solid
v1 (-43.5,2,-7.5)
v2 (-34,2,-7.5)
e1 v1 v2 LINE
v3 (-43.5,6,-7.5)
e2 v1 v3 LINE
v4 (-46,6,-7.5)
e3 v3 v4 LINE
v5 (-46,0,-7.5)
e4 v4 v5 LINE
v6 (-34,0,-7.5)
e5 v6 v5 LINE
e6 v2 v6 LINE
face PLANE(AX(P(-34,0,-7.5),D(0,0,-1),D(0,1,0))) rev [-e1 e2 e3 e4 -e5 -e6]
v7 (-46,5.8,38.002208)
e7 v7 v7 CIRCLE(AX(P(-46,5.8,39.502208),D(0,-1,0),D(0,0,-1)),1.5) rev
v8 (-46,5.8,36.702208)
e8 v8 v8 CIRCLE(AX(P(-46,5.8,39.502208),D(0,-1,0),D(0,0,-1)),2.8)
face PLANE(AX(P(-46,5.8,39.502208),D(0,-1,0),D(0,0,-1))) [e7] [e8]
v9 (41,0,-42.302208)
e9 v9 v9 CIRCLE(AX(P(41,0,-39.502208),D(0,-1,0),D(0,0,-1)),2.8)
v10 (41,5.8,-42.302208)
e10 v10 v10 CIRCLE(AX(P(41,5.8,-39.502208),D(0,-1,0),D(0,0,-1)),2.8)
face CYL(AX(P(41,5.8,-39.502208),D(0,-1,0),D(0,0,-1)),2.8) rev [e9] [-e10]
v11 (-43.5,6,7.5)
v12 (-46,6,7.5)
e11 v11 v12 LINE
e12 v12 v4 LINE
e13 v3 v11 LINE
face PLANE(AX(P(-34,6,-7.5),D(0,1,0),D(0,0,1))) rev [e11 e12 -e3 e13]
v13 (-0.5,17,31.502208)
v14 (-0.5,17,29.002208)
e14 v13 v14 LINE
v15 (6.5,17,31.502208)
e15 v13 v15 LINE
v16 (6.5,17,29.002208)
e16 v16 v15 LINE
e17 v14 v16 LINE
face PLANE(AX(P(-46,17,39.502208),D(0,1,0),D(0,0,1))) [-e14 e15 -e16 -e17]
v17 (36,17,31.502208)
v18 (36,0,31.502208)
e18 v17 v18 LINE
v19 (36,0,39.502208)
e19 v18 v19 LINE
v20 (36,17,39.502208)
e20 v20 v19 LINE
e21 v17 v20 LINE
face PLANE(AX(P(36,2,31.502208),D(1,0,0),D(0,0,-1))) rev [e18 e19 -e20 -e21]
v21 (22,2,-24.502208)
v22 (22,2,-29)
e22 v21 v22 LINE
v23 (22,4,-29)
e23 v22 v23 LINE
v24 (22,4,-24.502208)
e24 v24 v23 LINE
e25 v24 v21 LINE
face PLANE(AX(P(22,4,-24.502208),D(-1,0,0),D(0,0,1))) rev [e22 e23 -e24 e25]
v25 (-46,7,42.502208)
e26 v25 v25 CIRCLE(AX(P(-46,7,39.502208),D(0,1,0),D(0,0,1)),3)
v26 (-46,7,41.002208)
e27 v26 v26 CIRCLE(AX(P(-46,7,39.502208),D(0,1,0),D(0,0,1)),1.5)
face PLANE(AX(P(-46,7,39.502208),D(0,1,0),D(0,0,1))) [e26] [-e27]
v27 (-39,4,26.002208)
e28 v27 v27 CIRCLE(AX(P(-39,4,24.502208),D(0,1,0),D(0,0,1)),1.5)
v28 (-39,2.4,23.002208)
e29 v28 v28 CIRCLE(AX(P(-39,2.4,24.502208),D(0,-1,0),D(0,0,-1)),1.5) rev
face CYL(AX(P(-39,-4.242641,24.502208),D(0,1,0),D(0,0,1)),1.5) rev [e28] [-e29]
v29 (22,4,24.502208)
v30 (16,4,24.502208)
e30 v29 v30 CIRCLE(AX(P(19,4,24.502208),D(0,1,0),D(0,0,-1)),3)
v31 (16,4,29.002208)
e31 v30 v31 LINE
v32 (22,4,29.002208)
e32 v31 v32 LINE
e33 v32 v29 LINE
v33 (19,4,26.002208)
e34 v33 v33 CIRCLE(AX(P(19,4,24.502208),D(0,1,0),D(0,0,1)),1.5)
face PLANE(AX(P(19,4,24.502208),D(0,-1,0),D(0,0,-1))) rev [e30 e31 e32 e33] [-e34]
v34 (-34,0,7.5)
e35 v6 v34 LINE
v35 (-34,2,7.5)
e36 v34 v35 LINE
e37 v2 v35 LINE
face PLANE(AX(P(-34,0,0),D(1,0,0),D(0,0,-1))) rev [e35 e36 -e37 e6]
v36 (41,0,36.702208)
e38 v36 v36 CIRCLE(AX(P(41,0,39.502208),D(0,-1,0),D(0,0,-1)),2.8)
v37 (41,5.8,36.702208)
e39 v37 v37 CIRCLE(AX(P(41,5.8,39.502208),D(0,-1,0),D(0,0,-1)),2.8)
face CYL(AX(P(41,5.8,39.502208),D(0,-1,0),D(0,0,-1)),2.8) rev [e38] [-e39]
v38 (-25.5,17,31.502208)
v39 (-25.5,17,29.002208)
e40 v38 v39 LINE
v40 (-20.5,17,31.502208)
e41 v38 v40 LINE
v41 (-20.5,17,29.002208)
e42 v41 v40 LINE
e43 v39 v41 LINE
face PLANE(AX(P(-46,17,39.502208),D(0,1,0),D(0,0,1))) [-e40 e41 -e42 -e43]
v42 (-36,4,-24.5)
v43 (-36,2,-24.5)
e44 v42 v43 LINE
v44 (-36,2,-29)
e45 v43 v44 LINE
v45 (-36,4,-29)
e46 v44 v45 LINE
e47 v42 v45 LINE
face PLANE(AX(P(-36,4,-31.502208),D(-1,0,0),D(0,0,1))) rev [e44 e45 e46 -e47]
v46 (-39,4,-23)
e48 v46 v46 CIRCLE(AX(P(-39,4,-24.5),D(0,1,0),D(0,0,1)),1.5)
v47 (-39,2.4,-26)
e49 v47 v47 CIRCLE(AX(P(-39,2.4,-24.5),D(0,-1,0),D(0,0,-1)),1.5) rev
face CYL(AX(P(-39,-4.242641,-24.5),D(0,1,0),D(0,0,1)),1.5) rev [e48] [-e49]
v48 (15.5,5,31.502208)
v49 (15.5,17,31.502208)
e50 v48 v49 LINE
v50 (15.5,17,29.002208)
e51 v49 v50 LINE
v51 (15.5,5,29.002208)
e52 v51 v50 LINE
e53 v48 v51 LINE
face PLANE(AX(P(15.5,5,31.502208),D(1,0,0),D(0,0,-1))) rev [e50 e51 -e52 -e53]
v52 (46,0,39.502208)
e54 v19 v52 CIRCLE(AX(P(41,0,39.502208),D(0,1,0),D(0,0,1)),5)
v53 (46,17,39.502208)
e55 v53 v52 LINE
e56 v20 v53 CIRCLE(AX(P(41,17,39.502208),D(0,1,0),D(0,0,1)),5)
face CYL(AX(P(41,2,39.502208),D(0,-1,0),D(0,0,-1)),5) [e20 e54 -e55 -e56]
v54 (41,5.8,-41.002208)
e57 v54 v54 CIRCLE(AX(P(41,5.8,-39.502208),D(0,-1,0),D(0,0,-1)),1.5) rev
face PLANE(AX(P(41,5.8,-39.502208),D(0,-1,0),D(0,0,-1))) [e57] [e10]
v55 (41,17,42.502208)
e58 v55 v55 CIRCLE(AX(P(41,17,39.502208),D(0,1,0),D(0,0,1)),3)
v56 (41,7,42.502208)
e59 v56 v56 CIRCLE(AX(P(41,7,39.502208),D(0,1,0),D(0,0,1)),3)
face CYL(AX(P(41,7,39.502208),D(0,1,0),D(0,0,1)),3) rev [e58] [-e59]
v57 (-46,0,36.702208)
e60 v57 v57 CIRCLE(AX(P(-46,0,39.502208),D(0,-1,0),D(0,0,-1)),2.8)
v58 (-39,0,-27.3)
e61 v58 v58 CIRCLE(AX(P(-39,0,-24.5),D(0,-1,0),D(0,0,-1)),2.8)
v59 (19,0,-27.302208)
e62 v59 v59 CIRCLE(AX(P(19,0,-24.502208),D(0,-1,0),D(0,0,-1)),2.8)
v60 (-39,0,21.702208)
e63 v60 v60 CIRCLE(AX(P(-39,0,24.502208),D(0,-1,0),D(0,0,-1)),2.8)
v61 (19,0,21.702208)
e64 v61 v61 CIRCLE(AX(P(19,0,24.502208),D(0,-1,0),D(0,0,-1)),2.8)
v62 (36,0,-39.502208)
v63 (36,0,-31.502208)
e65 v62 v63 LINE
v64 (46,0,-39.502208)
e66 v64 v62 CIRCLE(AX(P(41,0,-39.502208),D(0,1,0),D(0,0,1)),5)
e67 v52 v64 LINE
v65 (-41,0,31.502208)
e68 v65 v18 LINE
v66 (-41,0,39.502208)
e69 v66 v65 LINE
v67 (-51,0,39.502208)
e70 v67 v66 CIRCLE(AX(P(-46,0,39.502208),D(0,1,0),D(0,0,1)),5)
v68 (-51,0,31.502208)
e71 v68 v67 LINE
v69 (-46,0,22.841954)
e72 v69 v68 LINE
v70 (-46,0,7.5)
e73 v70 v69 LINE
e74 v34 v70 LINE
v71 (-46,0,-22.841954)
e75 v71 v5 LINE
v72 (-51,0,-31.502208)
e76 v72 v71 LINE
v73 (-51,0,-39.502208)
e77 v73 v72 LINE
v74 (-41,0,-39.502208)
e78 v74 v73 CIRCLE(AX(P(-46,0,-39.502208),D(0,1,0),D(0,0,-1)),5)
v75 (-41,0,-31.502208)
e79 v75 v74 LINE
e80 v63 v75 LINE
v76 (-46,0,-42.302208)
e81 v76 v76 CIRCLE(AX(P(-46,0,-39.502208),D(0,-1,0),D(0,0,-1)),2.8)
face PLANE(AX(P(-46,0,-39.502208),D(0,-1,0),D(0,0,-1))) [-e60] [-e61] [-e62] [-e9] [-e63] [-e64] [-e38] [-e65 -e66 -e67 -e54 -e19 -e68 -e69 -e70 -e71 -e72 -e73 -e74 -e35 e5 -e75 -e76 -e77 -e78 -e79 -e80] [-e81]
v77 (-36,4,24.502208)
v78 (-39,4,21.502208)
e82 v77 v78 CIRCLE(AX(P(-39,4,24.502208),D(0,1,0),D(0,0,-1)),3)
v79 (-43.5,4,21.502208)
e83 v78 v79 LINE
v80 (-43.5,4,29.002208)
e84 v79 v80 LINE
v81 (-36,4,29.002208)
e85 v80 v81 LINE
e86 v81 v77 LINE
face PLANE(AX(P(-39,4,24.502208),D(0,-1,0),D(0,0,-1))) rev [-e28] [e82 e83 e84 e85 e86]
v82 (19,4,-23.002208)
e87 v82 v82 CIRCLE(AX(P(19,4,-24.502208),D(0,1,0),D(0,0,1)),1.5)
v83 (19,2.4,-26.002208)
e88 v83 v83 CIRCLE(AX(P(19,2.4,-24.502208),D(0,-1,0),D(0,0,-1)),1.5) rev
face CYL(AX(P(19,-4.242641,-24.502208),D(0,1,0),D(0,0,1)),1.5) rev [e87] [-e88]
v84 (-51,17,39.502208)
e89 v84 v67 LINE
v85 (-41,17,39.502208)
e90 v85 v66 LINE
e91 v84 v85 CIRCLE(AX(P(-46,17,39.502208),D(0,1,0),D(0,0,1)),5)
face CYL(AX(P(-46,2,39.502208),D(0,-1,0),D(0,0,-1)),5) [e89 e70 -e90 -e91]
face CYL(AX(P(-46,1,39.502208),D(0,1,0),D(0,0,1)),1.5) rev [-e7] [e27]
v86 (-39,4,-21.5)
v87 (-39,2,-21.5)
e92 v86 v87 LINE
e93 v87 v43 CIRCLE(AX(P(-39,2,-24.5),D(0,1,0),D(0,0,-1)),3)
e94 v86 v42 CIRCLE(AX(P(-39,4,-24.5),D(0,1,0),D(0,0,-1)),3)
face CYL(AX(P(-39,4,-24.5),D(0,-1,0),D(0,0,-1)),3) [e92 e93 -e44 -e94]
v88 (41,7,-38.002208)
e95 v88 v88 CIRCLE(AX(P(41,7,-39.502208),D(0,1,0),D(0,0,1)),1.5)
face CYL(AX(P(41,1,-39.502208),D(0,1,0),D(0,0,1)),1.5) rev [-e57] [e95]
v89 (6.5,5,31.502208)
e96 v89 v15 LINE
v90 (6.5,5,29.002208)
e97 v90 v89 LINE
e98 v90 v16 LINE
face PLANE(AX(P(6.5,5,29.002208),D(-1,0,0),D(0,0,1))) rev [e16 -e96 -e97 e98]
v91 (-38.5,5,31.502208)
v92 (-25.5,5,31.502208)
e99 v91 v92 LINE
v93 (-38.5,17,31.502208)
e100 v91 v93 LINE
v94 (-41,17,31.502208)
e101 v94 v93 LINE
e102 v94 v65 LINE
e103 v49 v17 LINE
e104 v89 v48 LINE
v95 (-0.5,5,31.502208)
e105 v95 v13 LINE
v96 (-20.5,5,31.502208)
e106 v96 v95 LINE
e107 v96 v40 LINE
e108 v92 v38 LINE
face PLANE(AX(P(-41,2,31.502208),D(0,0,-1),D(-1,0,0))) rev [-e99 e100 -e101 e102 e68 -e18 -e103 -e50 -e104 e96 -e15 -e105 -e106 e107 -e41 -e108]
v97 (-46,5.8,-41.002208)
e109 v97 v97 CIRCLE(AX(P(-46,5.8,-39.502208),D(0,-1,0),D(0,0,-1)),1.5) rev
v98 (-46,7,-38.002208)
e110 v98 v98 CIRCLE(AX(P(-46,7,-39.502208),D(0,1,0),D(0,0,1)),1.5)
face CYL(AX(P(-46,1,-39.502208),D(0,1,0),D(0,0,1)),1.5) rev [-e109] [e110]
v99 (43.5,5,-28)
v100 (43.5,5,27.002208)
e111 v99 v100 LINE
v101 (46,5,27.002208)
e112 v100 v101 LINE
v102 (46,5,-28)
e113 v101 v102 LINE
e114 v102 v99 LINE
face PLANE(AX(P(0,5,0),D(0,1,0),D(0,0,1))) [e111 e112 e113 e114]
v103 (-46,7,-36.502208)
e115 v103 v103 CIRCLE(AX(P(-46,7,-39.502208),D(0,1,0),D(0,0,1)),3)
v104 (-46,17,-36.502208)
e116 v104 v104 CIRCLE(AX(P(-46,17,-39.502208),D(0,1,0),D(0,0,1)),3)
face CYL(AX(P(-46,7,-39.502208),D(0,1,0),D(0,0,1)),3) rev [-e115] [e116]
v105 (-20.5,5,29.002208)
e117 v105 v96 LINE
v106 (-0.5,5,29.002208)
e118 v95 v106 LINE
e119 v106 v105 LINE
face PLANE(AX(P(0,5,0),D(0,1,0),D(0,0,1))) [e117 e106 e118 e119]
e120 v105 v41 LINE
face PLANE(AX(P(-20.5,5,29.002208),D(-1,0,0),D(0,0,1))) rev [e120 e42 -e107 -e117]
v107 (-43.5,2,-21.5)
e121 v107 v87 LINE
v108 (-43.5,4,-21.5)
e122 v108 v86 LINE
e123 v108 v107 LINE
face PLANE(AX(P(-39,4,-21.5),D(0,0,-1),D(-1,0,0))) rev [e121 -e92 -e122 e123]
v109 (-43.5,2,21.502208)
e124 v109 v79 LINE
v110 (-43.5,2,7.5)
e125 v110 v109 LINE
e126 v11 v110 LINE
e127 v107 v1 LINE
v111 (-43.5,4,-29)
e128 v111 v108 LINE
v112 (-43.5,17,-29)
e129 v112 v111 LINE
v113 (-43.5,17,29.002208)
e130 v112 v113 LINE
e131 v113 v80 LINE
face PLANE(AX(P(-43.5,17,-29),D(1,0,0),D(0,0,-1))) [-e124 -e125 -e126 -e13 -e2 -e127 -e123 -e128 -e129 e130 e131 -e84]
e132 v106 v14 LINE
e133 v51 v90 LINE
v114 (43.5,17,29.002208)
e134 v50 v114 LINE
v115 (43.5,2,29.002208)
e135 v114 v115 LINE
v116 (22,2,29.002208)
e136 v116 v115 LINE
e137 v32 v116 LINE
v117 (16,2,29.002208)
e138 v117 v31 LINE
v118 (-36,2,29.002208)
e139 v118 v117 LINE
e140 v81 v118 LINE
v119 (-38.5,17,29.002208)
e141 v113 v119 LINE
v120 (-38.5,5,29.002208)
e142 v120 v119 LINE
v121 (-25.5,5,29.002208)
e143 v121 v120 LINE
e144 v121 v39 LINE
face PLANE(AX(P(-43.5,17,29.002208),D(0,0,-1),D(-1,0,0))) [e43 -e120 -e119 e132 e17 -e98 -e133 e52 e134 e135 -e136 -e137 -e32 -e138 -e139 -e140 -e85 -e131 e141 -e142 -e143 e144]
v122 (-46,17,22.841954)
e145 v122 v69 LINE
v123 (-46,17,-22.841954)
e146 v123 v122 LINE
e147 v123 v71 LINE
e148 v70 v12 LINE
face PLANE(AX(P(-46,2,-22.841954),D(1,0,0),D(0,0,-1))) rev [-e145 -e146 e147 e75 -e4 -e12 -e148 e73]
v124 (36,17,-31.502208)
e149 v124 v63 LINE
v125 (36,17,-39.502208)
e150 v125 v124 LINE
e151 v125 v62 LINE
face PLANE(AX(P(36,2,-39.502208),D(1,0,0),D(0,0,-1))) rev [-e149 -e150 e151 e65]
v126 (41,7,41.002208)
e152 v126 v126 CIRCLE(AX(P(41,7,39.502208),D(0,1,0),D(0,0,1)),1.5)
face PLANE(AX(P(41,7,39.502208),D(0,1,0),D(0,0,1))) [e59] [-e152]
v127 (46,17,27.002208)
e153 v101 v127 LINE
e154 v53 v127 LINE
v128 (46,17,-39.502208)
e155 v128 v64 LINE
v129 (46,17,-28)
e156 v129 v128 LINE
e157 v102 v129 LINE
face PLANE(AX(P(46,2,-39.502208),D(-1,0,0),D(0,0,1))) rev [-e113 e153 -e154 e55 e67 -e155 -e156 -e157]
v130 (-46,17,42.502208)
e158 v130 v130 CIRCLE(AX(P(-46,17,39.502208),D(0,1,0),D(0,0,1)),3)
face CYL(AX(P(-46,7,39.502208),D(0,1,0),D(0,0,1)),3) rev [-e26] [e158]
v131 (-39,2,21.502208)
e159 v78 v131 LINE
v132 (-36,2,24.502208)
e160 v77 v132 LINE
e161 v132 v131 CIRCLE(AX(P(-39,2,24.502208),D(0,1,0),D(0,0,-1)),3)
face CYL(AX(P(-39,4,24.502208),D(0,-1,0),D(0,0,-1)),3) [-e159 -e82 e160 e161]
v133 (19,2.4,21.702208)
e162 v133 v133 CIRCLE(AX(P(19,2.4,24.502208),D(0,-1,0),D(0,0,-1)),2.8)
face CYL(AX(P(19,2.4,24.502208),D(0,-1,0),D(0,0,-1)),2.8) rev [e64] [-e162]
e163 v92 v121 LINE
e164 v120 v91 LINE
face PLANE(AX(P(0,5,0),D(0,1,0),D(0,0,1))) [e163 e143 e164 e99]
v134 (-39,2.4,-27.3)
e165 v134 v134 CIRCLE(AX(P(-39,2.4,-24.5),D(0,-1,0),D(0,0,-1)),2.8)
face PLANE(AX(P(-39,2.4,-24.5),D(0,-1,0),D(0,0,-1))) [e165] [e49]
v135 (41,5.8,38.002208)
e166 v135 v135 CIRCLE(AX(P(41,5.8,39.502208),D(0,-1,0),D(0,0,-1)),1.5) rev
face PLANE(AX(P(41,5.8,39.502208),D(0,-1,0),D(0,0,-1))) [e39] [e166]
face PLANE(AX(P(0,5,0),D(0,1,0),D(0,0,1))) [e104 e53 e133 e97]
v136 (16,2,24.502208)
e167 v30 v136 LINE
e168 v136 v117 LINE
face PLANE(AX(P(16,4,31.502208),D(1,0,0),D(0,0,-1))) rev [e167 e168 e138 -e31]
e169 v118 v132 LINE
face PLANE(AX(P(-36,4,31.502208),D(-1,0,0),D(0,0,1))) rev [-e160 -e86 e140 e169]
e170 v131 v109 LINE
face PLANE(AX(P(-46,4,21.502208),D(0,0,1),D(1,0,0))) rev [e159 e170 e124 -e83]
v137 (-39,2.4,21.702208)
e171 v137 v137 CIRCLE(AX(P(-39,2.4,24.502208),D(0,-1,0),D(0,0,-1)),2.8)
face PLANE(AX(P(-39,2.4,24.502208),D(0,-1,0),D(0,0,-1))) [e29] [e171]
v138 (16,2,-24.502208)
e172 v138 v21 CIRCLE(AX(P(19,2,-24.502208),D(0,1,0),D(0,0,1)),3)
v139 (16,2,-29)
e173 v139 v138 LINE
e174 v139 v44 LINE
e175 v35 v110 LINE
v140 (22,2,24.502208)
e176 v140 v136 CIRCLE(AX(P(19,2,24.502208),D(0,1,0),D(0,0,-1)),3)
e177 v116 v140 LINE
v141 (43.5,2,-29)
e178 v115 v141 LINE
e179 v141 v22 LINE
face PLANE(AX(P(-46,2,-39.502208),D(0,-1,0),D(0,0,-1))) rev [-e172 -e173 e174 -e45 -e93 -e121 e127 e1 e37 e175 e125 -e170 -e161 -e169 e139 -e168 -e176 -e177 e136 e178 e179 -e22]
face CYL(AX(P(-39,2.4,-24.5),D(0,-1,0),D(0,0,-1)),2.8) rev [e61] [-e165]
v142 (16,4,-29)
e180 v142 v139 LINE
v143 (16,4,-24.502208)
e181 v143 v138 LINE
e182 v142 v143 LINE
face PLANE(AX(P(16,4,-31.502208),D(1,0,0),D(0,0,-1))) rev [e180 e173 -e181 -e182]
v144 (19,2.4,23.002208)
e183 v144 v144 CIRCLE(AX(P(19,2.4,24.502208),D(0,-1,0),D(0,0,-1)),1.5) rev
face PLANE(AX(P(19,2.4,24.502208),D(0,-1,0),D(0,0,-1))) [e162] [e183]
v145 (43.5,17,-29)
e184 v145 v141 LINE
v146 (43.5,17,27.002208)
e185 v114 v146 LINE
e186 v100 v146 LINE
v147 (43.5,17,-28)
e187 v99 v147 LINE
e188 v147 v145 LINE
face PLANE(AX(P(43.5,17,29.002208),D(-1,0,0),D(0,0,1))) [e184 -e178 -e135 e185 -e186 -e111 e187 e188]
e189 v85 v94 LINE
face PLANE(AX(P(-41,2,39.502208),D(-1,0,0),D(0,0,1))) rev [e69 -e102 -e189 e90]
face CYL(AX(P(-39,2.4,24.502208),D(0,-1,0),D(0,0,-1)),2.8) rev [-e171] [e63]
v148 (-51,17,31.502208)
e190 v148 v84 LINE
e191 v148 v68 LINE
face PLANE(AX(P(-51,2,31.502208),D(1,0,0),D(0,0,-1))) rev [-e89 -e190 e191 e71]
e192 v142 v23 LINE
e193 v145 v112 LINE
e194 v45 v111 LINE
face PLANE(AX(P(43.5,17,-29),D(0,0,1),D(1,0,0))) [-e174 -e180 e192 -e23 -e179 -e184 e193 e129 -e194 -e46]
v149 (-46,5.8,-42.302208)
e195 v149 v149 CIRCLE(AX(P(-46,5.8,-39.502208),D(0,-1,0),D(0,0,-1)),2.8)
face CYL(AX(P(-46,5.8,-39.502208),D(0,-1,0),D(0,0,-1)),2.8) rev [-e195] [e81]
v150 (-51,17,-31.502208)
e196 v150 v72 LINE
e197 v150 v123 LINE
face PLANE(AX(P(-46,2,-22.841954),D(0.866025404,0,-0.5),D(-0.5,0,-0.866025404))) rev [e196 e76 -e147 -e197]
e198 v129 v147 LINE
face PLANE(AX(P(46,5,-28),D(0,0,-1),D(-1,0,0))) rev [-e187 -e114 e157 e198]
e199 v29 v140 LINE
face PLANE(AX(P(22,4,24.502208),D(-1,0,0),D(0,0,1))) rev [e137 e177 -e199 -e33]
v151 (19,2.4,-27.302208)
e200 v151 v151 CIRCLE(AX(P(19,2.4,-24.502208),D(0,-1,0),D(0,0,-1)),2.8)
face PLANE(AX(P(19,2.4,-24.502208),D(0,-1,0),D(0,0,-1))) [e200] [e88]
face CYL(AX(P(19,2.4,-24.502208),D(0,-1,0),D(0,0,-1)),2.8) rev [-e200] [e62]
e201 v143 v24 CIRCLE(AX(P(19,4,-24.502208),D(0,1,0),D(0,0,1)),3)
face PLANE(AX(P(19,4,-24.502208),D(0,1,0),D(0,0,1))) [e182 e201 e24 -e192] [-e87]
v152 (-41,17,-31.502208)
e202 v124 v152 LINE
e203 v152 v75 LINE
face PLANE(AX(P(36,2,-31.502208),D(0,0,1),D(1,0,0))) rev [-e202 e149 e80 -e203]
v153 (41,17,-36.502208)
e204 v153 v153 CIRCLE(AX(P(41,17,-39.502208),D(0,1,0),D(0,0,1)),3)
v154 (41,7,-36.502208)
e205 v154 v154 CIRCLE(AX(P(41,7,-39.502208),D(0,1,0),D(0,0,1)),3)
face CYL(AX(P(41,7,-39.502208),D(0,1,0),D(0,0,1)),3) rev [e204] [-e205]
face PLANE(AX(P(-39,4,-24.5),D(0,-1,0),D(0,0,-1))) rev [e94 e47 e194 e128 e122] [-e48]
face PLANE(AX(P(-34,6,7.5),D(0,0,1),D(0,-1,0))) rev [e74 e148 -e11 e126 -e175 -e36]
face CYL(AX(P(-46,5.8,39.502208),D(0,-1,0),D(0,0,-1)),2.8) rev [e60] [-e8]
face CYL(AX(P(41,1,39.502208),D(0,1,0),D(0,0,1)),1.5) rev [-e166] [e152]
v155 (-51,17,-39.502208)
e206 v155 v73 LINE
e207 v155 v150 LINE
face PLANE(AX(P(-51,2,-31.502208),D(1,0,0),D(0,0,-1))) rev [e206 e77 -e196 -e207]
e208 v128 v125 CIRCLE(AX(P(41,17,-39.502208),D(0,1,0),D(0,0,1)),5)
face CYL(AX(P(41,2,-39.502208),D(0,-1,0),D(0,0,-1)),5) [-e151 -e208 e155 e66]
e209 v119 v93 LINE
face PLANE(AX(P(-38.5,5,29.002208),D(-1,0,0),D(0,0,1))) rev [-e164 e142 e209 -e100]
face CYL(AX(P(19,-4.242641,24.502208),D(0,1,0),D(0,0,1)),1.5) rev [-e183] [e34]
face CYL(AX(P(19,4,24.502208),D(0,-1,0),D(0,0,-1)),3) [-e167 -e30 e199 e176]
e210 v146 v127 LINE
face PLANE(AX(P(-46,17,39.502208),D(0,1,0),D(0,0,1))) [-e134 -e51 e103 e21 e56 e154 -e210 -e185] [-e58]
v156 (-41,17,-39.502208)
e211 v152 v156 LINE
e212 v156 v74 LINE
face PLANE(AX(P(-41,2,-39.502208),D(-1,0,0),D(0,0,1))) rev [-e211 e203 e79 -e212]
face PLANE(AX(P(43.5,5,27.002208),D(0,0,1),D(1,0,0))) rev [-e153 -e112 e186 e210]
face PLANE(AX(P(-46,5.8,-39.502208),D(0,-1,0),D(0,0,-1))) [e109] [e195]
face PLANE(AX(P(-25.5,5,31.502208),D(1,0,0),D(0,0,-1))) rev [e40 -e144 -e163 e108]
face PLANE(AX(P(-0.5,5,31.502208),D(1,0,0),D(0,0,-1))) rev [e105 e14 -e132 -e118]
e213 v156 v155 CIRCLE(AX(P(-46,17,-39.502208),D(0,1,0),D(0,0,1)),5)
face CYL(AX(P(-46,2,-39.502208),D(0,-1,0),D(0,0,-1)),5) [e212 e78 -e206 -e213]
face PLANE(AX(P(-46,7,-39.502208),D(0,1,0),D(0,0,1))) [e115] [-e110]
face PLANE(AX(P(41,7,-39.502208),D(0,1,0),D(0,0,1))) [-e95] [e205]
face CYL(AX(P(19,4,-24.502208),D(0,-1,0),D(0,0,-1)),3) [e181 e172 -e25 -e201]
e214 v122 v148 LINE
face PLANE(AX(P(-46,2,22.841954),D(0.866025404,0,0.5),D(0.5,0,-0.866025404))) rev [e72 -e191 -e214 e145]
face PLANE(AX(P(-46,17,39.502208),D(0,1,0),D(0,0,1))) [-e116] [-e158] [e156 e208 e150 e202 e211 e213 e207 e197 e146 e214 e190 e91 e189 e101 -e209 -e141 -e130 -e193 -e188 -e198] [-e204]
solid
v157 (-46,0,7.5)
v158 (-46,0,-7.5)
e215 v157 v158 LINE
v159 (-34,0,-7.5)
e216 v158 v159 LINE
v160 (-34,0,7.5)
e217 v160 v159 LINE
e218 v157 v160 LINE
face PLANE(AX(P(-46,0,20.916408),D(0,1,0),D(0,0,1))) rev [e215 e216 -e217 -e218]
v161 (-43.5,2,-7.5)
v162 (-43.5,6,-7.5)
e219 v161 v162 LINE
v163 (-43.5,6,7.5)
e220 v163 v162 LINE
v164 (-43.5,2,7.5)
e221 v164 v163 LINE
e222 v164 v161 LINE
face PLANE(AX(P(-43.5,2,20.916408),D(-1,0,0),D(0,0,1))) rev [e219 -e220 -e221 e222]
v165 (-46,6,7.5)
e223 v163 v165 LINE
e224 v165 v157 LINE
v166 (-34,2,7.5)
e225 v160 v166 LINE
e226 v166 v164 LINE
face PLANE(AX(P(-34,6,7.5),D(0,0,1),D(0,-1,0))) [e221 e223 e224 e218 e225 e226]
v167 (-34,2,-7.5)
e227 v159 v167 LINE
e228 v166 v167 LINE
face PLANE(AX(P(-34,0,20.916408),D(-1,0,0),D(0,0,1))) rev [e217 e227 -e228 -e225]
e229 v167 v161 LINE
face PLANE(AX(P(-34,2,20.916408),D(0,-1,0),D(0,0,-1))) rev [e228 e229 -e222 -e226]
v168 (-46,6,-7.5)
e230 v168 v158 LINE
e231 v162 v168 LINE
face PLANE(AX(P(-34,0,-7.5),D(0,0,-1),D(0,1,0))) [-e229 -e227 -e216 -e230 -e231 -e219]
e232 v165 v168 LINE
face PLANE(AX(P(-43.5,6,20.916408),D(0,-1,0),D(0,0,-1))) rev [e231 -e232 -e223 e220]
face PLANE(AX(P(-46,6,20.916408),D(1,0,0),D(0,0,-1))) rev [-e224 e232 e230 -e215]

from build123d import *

# Parameters (mm, degrees)
BOSS_EXTRUDE1_DEPTH = 2
BOSS_EXTRUDE2_DEPTH = 2
SKETCH6_W           = 87
SKETCH6_H           = 58.002207555
BOSS_EXTRUDE3_DEPTH = 15
HOLE3_OUTLINE_R     = 1.5
HOLE3_DEPTH         = 4
HOLE4_OUTLINE_R     = 2.8
HOLE4_OUTLINE_R_2   = 1.5
HOLE4_DEPTH         = 2.4
SKETCH9_W           = 15
SKETCH9_H           = 6
CUT_EXTRUDE1_DEPTH  = 12
SKETCH10_W          = 13
SKETCH10_H          = 2.5
SKETCH10_W_2        = 20
SKETCH10_W_3        = 9
SKETCH10_W_4        = 2.5
SKETCH10_H_2        = 55.002207555
CUT_EXTRUDE2_DEPTH  = 12
HOLE5_START         = 7
HOLE5_OUTLINE_R     = 3
HOLE5_DEPTH         = 10
BOSS_EXTRUDE4_START = -7.5
BOSS_EXTRUDE4_DEPTH = 15
SKETCH_1_R          = 1.5
CUT_EXTRUDE_1_DEPTH = 6
SKETCH_2_R          = 2.8
CUT_EXTRUDE_2_DEPTH = 5.8


# Read off the part's stored shape, not the designer's step: Hole3, Hole4, Hole5
with BuildPart() as part:
    # Sketch1 → Boss-Extrude1 (new body)
    with BuildSketch(Plane(origin=(0, 0, 0), x_dir=(1, 0, 0), z_dir=(0, 1, 0))):
        with BuildLine():
            Line((-46, 22.841953517), (-46, -22.841953517))
            Line((-46, -22.841953517), (-51, -31.502207555))
            Line((-51, -31.502207555), (-51, -39.502207555))
            ThreePointArc((-51, -39.502207555), (-46, -44.502207555), (-41, -39.502207555))
            Line((-41, -39.502207555), (-41, -31.502207555))
            Line((-41, -31.502207555), (36, -31.502207555))
            Line((36, -31.502207555), (36, -39.502207555))
            ThreePointArc((36, -39.502207555), (41, -44.502207555), (46, -39.502207555))
            Line((46, -39.502207555), (46, 39.502207555))
            ThreePointArc((46, 39.502207555), (41, 44.502207555), (36, 39.502207555))
            Line((36, 39.502207555), (36, 31.502207555))
            Line((36, 31.502207555), (-41, 31.502207555))
            Line((-41, 31.502207555), (-41, 39.502207555))
            ThreePointArc((-41, 39.502207555), (-46, 44.502207555), (-51, 39.502207555))
            Line((-51, 39.502207555), (-51, 31.502207555))
            Line((-51, 31.502207555), (-46, 22.841953517))
        make_face()
    extrude(amount=BOSS_EXTRUDE1_DEPTH)

    # Sketch2 → Boss-Extrude2 (add)
    with BuildSketch(Plane(origin=(0, 2, 0), x_dir=(1, 0, 0), z_dir=(0, 1, 0))):
        with BuildLine():
            Line((-36, 31.502207555), (-36, 24.5))
            ThreePointArc((-36, 24.5), (-36.878679656, 22.378679656), (-39, 21.5))
            Line((-39, 21.5), (-46, 21.5))
            Line((-46, 21.5), (-46, 31.502207555))
            Line((-46, 31.502207555), (-36, 31.502207555))
        make_face()
        with BuildLine():
            Line((16, 31.502207555), (16, 24.502207555))
            ThreePointArc((16, 24.502207555), (19, 21.502207555), (22, 24.502207555))
            Line((22, 24.502207555), (22, 31.502207555))
            Line((22, 31.502207555), (16, 31.502207555))
        make_face()
        with BuildLine():
            Line((-36, -31.502207555), (-46, -31.502207555))
            Line((-46, -31.502207555), (-46, -21.502207555))
            Line((-46, -21.502207555), (-39, -21.502207555))
            ThreePointArc((-39, -21.502207555), (-36.878679656, -22.380887212), (-36, -24.502207555))
            Line((-36, -24.502207555), (-36, -31.502207555))
        make_face()
        with BuildLine():
            Line((16, -31.502207555), (16, -24.502207555))
            ThreePointArc((16, -24.502207555), (19, -21.502207555), (22, -24.502207555))
            Line((22, -24.502207555), (22, -31.502207555))
            Line((22, -31.502207555), (16, -31.502207555))
        make_face()
    extrude(amount=BOSS_EXTRUDE2_DEPTH)

    # Sketch6 → Boss-Extrude3 (add)
    with BuildSketch(Plane(origin=(0, 2, 0), x_dir=(1, 0, 0), z_dir=(0, 1, 0))):
        with BuildLine():
            Line((-46, -22.841953517), (-51, -31.502207555))
            Line((-51, -31.502207555), (-51, -39.502207555))
            ThreePointArc((-51, -39.502207555), (-46, -44.502207555), (-41, -39.502207555))
            Line((-41, -39.502207555), (-41, -31.502207555))
            Line((-41, -31.502207555), (36, -31.502207555))
            Line((36, -31.502207555), (36, -39.502207555))
            ThreePointArc((36, -39.502207555), (41, -44.502207555), (46, -39.502207555))
            Line((46, -39.502207555), (46, 39.502207555))
            ThreePointArc((46, 39.502207555), (41, 44.502207555), (36, 39.502207555))
            Line((36, 39.502207555), (36, 31.502207555))
            Line((36, 31.502207555), (-41, 31.502207555))
            Line((-41, 31.502207555), (-41, 39.502207555))
            ThreePointArc((-41, 39.502207555), (-46, 44.502207555), (-51, 39.502207555))
            Line((-51, 39.502207555), (-51, 31.502207555))
            Line((-51, 31.502207555), (-46, 22.841953517))
            Line((-46, 22.841953517), (-46, -22.841953517))
        make_face()
        with Locations((0, -0.001103777)):
            Rectangle(SKETCH6_W, SKETCH6_H, mode=Mode.SUBTRACT)
    extrude(amount=BOSS_EXTRUDE3_DEPTH)

    # Hole3 outline → Hole3 (cut)
    with BuildSketch(Plane(origin=(0, 0, 0), x_dir=(1, 0, 0), z_dir=(0, 1, 0))):
        with Locations((-39, 24.5)):
            Circle(HOLE3_OUTLINE_R)
        with Locations((19, 24.502207555)):
            Circle(HOLE3_OUTLINE_R)
        with Locations((-39, -24.502207555)):
            Circle(HOLE3_OUTLINE_R)
        with Locations((19, -24.502207555)):
            Circle(HOLE3_OUTLINE_R)
    extrude(amount=HOLE3_DEPTH, mode=Mode.SUBTRACT)

    # Hole4 outline → Hole4 (cut)
    # profile 1 of 4: a face of its own
    with BuildSketch(Plane(origin=(0, 0, 0), x_dir=(1, 0, 0), z_dir=(0, 1, 0))):
        with Locations((19, 24.502207555)):
            Circle(HOLE4_OUTLINE_R)
        with Locations((19, 24.502207555)):
            Circle(HOLE4_OUTLINE_R_2, mode=Mode.SUBTRACT)
    # profile 2 of 4: a face of its own
    with BuildSketch(Plane(origin=(0, 0, 0), x_dir=(1, 0, 0), z_dir=(0, 1, 0))):
        with Locations((19, -24.502207555)):
            Circle(HOLE4_OUTLINE_R)
        with Locations((19, -24.502207555)):
            Circle(HOLE4_OUTLINE_R_2, mode=Mode.SUBTRACT)
    # profile 3 of 4: a face of its own
    with BuildSketch(Plane(origin=(0, 0, 0), x_dir=(1, 0, 0), z_dir=(0, 1, 0))):
        with Locations((-39, -24.502207555)):
            Circle(HOLE4_OUTLINE_R)
        with Locations((-39, -24.502207555)):
            Circle(HOLE4_OUTLINE_R_2, mode=Mode.SUBTRACT)
    # profile 4 of 4: a face of its own
    with BuildSketch(Plane(origin=(0, 0, 0), x_dir=(1, 0, 0), z_dir=(0, 1, 0))):
        with Locations((-39, 24.5)):
            Circle(HOLE4_OUTLINE_R)
        with Locations((-39, 24.5)):
            Circle(HOLE4_OUTLINE_R_2, mode=Mode.SUBTRACT)
    extrude(amount=HOLE4_DEPTH, mode=Mode.SUBTRACT)

    # Sketch9 → Cut-Extrude1 (cut)
    with BuildSketch(Plane.ZY.offset(46)):
        with Locations((0, 3)):
            Rectangle(SKETCH9_W, SKETCH9_H)
    extrude(amount=-CUT_EXTRUDE1_DEPTH, mode=Mode.SUBTRACT)

    # Sketch10 → Cut-Extrude2 (cut)
    with BuildSketch(Plane(origin=(0, 17, 0), x_dir=(1, 0, 0), z_dir=(0, 1, 0))):
        with Locations((-32, -30.252207555)):
            Rectangle(SKETCH10_W, SKETCH10_H)
        with Locations((-10.5, -30.252207555)):
            Rectangle(SKETCH10_W_2, SKETCH10_H)
        with Locations((11, -30.252207555)):
            Rectangle(SKETCH10_W_3, SKETCH10_H)
        with Locations((44.75, 0.498896222)):
            Rectangle(SKETCH10_W_4, SKETCH10_H_2)
    extrude(amount=-CUT_EXTRUDE2_DEPTH, mode=Mode.SUBTRACT)

    # Hole5 outline → Hole5 (cut)
    with BuildSketch(Plane(origin=(0, 0, 0), x_dir=(1, 0, 0), z_dir=(0, 1, 0)).offset(HOLE5_START)):
        with Locations((-46, -39.502207555)):
            Circle(HOLE5_OUTLINE_R)
        with Locations((41, 39.502207555)):
            Circle(HOLE5_OUTLINE_R)
        with Locations((-46, 39.502207555)):
            Circle(HOLE5_OUTLINE_R)
        with Locations((41, -39.502207555)):
            Circle(HOLE5_OUTLINE_R)
    extrude(amount=HOLE5_DEPTH, mode=Mode.SUBTRACT)

    # 草图1 → 切除-拉伸1 (cut)
    with BuildSketch(Plane(origin=(0, 7, 0), x_dir=(1, 0, 0), z_dir=(0, 1, 0))):
        with Locations(Location((-46, 39.502207555, 0), (0, 0, 270))):
            Circle(SKETCH_1_R)
        with Locations(Location((41, 39.502207555, 0), (0, 0, 270))):
            Circle(SKETCH_1_R)
        with Locations(Location((41, -39.502207555, 0), (0, 0, 270))):
            Circle(SKETCH_1_R)
        with Locations(Location((-46, -39.502207555, 0), (0, 0, 270))):
            Circle(SKETCH_1_R)
    extrude(amount=-CUT_EXTRUDE_1_DEPTH, mode=Mode.SUBTRACT)

    # 草图2 → 切除-拉伸2 (cut)
    with BuildSketch(Plane.XZ):
        with Locations(Location((41, -39.502207555, 0), (0, 0, 270))):
            Circle(SKETCH_2_R)
        with Locations(Location((41, 39.502207555, 0), (0, 0, 270))):
            Circle(SKETCH_2_R)
        with Locations(Location((-46, 39.502207555, 0), (0, 0, 270))):
            Circle(SKETCH_2_R)
        with Locations(Location((-46, -39.502207555, 0), (0, 0, 270))):
            Circle(SKETCH_2_R)
    extrude(amount=-CUT_EXTRUDE_2_DEPTH, mode=Mode.SUBTRACT)


with BuildPart() as body_2:
    # Sketch12 → Boss-Extrude4 (new body)
    with BuildSketch(Plane.XY.offset(BOSS_EXTRUDE4_START)):
        Polygon((-46, 6), (-46, 0), (-34, 0), (-34, 2), (-43.5, 2), (-43.5, 6), align=None)
    extrude(amount=BOSS_EXTRUDE4_DEPTH)


solid = Compound([part.part, body_2.part])
